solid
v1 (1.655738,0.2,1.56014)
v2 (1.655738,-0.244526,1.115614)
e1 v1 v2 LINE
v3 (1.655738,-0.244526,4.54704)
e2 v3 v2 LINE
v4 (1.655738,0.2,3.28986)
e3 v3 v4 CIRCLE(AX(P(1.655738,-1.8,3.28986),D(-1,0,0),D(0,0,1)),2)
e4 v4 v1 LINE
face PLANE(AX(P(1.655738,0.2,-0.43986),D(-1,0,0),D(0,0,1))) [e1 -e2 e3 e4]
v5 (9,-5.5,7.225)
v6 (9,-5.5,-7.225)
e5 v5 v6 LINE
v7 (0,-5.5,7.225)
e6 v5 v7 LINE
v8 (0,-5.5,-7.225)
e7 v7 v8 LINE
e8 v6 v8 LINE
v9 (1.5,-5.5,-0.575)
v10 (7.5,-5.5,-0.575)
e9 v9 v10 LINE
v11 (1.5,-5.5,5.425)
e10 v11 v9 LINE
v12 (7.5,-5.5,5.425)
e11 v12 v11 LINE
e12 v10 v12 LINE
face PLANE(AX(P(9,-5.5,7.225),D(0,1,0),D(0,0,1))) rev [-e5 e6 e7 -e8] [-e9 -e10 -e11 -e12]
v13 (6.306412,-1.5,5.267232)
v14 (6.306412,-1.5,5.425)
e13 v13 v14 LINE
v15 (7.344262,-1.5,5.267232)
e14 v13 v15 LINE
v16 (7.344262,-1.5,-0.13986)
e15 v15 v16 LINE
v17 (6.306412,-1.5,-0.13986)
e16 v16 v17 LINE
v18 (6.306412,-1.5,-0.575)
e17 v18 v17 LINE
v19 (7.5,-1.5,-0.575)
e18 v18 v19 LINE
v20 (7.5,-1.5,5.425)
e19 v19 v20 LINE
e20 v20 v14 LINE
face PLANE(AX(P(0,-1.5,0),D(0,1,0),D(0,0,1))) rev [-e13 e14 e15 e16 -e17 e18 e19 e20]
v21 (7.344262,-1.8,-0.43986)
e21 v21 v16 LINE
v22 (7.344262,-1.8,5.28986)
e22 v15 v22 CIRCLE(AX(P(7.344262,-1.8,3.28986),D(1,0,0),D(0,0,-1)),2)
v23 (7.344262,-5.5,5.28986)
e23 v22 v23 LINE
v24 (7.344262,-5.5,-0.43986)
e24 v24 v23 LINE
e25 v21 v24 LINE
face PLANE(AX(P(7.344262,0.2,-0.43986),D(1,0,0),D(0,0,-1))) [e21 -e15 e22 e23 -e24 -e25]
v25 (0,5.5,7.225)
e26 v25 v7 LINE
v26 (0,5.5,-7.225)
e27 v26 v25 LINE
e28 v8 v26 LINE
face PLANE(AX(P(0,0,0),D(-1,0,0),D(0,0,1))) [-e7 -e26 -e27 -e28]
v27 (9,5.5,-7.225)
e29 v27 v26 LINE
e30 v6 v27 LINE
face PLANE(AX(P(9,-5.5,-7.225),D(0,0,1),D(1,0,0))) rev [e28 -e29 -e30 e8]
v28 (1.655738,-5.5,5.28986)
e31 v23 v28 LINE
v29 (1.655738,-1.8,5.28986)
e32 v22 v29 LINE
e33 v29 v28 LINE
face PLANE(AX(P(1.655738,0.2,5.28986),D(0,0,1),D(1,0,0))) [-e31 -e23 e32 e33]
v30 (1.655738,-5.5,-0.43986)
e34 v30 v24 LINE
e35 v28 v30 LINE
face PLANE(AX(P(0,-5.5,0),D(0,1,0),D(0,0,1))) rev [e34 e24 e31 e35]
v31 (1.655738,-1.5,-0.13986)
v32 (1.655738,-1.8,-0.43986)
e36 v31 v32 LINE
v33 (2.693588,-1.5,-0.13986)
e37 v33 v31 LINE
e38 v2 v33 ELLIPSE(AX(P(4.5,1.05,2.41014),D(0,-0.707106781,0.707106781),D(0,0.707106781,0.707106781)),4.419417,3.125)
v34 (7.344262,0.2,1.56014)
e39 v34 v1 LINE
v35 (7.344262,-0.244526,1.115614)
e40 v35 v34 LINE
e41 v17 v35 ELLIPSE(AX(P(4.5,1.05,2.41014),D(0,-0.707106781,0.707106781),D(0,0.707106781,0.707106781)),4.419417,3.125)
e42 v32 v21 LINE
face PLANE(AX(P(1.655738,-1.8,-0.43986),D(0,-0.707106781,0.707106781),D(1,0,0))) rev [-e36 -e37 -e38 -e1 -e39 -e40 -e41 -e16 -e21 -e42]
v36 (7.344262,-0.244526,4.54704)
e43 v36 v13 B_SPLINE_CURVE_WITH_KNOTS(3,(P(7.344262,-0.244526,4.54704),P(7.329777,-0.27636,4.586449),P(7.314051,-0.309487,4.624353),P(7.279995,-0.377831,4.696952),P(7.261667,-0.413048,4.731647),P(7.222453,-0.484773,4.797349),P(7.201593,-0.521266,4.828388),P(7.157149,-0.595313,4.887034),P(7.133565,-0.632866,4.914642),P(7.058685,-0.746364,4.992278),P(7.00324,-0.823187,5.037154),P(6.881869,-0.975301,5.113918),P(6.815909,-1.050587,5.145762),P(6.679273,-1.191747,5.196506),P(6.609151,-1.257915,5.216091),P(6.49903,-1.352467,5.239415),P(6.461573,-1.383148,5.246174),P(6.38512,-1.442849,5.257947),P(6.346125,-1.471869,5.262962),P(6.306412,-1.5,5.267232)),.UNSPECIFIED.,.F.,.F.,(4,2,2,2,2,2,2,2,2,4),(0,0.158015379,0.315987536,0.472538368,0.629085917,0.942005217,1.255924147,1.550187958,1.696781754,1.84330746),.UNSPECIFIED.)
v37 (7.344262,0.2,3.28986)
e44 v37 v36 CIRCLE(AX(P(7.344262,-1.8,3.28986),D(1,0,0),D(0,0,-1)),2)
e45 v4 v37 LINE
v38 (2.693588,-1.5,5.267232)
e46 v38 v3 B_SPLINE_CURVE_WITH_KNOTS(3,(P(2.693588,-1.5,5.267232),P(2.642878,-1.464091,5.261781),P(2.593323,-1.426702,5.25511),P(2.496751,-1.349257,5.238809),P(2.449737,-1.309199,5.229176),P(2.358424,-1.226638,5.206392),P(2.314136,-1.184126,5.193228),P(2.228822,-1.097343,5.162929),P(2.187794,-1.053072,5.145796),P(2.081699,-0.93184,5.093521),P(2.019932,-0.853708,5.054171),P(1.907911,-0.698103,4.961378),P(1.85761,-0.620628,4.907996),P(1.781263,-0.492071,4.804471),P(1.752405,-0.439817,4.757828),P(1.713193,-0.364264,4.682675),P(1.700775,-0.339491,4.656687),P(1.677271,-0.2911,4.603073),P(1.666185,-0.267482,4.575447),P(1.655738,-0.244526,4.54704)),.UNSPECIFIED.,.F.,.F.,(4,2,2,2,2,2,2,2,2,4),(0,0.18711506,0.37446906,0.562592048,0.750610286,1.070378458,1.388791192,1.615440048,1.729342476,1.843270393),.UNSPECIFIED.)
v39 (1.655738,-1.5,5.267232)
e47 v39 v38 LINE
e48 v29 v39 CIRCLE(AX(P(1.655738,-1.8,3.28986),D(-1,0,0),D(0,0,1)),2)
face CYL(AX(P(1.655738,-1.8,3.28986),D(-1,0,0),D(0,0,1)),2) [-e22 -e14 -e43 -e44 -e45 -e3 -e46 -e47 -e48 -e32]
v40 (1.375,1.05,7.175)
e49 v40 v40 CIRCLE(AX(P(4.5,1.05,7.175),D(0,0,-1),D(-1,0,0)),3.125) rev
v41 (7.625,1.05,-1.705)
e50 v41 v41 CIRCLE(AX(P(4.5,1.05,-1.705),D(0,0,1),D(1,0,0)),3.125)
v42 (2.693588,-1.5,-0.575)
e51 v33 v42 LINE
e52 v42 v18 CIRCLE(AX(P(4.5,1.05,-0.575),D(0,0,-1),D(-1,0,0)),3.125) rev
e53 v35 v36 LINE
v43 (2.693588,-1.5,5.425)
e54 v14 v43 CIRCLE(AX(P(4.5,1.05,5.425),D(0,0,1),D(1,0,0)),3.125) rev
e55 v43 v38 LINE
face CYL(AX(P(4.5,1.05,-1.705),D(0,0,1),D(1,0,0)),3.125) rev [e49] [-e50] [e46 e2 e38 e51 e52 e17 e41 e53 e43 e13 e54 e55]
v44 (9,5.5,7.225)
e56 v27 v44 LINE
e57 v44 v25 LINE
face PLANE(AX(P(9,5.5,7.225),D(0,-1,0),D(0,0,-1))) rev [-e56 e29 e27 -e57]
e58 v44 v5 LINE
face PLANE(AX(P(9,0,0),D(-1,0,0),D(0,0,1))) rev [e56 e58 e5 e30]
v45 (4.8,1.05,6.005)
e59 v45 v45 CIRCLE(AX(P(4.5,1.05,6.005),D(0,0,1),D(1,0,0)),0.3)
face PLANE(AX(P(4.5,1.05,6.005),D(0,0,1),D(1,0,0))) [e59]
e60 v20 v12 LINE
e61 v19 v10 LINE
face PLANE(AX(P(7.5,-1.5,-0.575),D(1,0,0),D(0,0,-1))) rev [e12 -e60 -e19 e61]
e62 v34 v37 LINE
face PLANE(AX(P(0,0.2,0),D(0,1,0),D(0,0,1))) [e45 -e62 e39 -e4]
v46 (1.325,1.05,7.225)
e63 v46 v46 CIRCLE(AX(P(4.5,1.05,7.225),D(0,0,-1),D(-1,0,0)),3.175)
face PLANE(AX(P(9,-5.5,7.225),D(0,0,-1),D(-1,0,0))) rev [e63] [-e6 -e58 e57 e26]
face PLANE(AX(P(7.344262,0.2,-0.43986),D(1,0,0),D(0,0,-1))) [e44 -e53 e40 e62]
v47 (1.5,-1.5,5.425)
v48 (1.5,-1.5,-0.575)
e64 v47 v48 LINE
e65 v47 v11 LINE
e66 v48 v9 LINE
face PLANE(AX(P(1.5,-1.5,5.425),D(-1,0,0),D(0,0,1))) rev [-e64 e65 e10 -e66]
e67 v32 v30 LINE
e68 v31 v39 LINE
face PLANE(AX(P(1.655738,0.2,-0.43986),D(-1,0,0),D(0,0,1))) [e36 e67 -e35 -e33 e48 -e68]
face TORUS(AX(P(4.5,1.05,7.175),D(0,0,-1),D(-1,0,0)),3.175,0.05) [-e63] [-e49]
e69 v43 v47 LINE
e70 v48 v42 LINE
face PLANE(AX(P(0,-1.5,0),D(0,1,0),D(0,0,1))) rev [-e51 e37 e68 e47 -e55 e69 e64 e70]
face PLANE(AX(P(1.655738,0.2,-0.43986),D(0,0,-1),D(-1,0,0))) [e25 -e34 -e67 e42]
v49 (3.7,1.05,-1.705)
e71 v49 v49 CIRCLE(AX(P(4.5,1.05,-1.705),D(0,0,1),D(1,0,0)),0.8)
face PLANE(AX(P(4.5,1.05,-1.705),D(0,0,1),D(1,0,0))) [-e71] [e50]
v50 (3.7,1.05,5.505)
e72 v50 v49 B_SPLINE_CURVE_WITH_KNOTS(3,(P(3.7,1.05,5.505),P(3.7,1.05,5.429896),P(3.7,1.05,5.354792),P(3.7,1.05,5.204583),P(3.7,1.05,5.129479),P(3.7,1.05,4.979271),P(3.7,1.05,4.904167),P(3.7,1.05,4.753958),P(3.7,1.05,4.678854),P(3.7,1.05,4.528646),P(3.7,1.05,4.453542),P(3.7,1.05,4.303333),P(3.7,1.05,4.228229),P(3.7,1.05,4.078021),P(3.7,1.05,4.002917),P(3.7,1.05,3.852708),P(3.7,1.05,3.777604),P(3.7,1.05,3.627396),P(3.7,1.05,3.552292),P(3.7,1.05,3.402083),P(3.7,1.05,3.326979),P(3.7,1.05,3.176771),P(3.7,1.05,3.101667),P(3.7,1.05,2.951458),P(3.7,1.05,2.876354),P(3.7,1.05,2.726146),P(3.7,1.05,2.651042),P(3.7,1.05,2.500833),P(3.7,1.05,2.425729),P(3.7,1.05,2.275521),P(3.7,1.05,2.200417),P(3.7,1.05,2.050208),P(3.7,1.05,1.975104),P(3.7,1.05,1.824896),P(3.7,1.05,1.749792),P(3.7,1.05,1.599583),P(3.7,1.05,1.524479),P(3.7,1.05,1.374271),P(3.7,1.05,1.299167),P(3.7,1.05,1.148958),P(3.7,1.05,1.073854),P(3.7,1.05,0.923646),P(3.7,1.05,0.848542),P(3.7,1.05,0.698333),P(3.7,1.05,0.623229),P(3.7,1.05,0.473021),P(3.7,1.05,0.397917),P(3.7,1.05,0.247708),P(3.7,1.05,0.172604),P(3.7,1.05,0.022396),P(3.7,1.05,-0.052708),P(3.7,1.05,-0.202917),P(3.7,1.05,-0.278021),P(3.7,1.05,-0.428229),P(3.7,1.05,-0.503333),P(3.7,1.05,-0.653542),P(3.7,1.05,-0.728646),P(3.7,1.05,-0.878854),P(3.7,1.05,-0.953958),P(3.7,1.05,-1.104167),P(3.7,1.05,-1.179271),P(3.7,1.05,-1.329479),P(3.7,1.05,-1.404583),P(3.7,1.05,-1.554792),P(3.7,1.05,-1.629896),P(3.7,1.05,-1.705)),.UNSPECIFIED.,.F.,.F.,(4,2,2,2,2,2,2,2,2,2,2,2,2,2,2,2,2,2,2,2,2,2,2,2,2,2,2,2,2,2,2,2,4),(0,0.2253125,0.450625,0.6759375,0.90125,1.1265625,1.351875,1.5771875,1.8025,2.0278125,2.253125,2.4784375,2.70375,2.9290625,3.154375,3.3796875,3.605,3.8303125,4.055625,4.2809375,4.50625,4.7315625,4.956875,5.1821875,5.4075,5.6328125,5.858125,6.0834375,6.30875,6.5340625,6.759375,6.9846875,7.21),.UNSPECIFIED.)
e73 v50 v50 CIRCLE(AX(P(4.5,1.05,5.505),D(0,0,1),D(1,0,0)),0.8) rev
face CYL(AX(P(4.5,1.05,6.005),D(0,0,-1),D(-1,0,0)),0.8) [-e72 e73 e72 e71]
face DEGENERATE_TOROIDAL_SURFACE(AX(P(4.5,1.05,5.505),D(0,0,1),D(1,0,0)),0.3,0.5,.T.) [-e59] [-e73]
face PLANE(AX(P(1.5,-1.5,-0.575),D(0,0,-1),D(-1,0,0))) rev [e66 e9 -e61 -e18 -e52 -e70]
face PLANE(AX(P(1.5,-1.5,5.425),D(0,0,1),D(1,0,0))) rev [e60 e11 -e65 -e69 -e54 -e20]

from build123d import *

# Parameters (mm, degrees)
ESBO_O1_W                     = 14.45
ESBO_O1_H                     = 11
RESSALTO_EXTRUS_O1_DEPTH      = 9
ESBO_O3_R                     = 3.125
CORTE_EXTRUS_O2_DEPTH         = 8.93
ESBO_O4_R                     = 0.8
RESSALTO_EXTRUS_O2_DEPTH      = 7.71
FILETE1_R                     = 0.5
FILETE2_R                     = 0.05
ESBO_O5_W                     = 6
ESBO_O5_H                     = 6
CORTE_EXTRUS_O5_DEPTH         = 4
RESSALTO_EXTRUS_O4_DEPTH      = 4
RESSALTO_EXTRUS_O4_DEPTH_BACK = 1.7
ESBO_O7_W                     = 5.688524138
ESBO_O7_H                     = 5.729720352
FILETE5_R                     = 2
CHANFRO4_SIZE                 = 2


with BuildPart() as part:
    # Esboço1 → Ressalto-extrusão1 (new body)
    with BuildSketch(Plane(origin=(0, 0, 0), x_dir=(0, 0, -1), z_dir=(1, 0, 0))):
        Rectangle(ESBO_O1_W, ESBO_O1_H)
    extrude(amount=RESSALTO_EXTRUS_O1_DEPTH)

    # Esboço3 → Corte-extrusão2 (cut)
    with BuildSketch(Plane.XY.offset(7.225)):
        with Locations((4.5, 1.05)):
            Circle(ESBO_O3_R)
    extrude(amount=-CORTE_EXTRUS_O2_DEPTH, mode=Mode.SUBTRACT)

    # Esboço4 → Ressalto-extrusão2 (add)
    with BuildSketch(Plane.XY.offset(-1.705)):
        with Locations(Location((4.5, 1.05, 0), (0, 0, 180))):
            Circle(ESBO_O4_R)
    extrude(amount=RESSALTO_EXTRUS_O2_DEPTH)

    # Filete1
    filete1_edges = [part.edges().sort_by_distance(p)[0] for p in [
        (5.3, 1.05, 6.005),
    ]]
    fillet(filete1_edges, radius=FILETE1_R)

    # Filete2
    filete2_edges = [part.edges().sort_by_distance(p)[0] for p in [
        (1.375, 1.05, 7.225),
    ]]
    fillet(filete2_edges, radius=FILETE2_R)

    # Esboço5 → Corte-extrusão5 (cut)
    with BuildSketch(Plane.XZ.offset(5.5)):
        with Locations((4.5, 2.425)):
            Rectangle(ESBO_O5_W, ESBO_O5_H)
    extrude(amount=-CORTE_EXTRUS_O5_DEPTH, mode=Mode.SUBTRACT)

    # Esboço7 → Ressalto-extrusão4 (add, two sides: drawn at the far end of the back side and taken through both)
    with BuildSketch(Plane.XZ.offset(1.5).offset(-RESSALTO_EXTRUS_O4_DEPTH_BACK)):
        with Locations((4.5, 2.425)):
            Rectangle(ESBO_O7_W, ESBO_O7_H)
    extrude(amount=RESSALTO_EXTRUS_O4_DEPTH + RESSALTO_EXTRUS_O4_DEPTH_BACK)

    # Filete5
    # the kernel refuses this fillet: 2 mm, written as the material it takes off along each edge
    with BuildSketch(Plane(origin=(12.344262069, 0.2, 5.289860176), x_dir=(0, -1, 0), z_dir=(-1, 0, 0))) as filete5_piece_1_section:
        with BuildLine():
            CenterArc((FILETE5_R, -FILETE5_R), FILETE5_R, 90, 90)
            Line((0, -FILETE5_R), (0, 0))
            Line((0, 0), (FILETE5_R, 0))
        make_face()
    filete5_piece_1 = extrude(amount=15.688524139, mode=Mode.PRIVATE)
    filete5_piece_1 = split(filete5_piece_1, bisect_by=Plane(origin=(6.764399642, -1.5, 5.283313475), z_dir=(0, -1, 0)), keep=Keep.TOP, mode=Mode.PRIVATE)
    filete5_piece_1 = split(filete5_piece_1, bisect_by=Plane(origin=(1.5, -1.579624939, 5.283313475), z_dir=(1, 0, 0)), keep=Keep.TOP, mode=Mode.PRIVATE)
    filete5_piece_1 = split(filete5_piece_1, bisect_by=Plane(origin=(7.5, -1.579624939, 5.283313475), z_dir=(-1, 0, 0)), keep=Keep.TOP, mode=Mode.PRIVATE)
    add(filete5_piece_1, mode=Mode.SUBTRACT)
    with BuildSketch(Plane(origin=(12.344262069, 0.2, 5.289860176), x_dir=(0, -1, 0), z_dir=(-1, 0, 0))) as filete5_piece_2_section:
        with BuildLine():
            CenterArc((FILETE5_R, -FILETE5_R), FILETE5_R, 90, 90)
            Line((0, -FILETE5_R), (0, 0))
            Line((0, 0), (FILETE5_R, 0))
        make_face()
    filete5_piece_2 = extrude(amount=15.688524139, mode=Mode.PRIVATE)
    filete5_piece_2 = filete5_piece_2 & Plane(origin=(4.5, 1.05, 4.831537274), x_dir=(1, 0, 0), z_dir=(0, 0, 1)) * Cylinder(3.125, 40, mode=Mode.PRIVATE)
    add(filete5_piece_2, mode=Mode.SUBTRACT)

    # Chanfro4
    # the kernel refuses this chamfer: 2 mm, written as the material it takes off along each edge
    with BuildSketch(Plane(origin=(-3.487628045, 0.2, -0.439860176), x_dir=(0, 0.02749587661058638, 0.9996219169112968), z_dir=(1, 0, 0))) as chanfro4_piece_1_section:
        Polygon((CHANFRO4_SIZE * 0.999621916911, CHANFRO4_SIZE * 0.0274958766106), (-CHANFRO4_SIZE * 0.0274958766106, CHANFRO4_SIZE * 0.999621916911), (0, 0), align=None)
    chanfro4_piece_1 = extrude(amount=15.975256091, mode=Mode.PRIVATE)
    chanfro4_piece_1 = split(chanfro4_piece_1, bisect_by=Plane(origin=(2.25835967, -1.5, -0.343331673), z_dir=(0, -1, 0)), keep=Keep.TOP, mode=Mode.PRIVATE)
    chanfro4_piece_1 = split(chanfro4_piece_1, bisect_by=Plane(origin=(7.5, -1.606942994, -0.343331673), z_dir=(-1, 0, 0)), keep=Keep.TOP, mode=Mode.PRIVATE)
    chanfro4_piece_1 = split(chanfro4_piece_1, bisect_by=Plane(origin=(1.5, -1.606942994, -0.343331673), z_dir=(1, 0, 0)), keep=Keep.TOP, mode=Mode.PRIVATE)
    add(chanfro4_piece_1, mode=Mode.SUBTRACT)
    with BuildSketch(Plane(origin=(-3.487628045, 0.2, -0.439860176), x_dir=(0, 0.02749587661058638, 0.9996219169112968), z_dir=(1, 0, 0))) as chanfro4_piece_2_section:
        Polygon((CHANFRO4_SIZE * 0.999621916911, CHANFRO4_SIZE * 0.0274958766106), (-CHANFRO4_SIZE * 0.0274958766106, CHANFRO4_SIZE * 0.999621916911), (0, 0), align=None)
    chanfro4_piece_2 = extrude(amount=15.975256091, mode=Mode.PRIVATE)
    chanfro4_piece_2 = chanfro4_piece_2 & Plane(origin=(4.5, 1.05, 0.259438948), x_dir=(1, 0, 0), z_dir=(0, 0, 1)) * Cylinder(3.125, 40, mode=Mode.PRIVATE)
    add(chanfro4_piece_2, mode=Mode.SUBTRACT)


solid = part.part
